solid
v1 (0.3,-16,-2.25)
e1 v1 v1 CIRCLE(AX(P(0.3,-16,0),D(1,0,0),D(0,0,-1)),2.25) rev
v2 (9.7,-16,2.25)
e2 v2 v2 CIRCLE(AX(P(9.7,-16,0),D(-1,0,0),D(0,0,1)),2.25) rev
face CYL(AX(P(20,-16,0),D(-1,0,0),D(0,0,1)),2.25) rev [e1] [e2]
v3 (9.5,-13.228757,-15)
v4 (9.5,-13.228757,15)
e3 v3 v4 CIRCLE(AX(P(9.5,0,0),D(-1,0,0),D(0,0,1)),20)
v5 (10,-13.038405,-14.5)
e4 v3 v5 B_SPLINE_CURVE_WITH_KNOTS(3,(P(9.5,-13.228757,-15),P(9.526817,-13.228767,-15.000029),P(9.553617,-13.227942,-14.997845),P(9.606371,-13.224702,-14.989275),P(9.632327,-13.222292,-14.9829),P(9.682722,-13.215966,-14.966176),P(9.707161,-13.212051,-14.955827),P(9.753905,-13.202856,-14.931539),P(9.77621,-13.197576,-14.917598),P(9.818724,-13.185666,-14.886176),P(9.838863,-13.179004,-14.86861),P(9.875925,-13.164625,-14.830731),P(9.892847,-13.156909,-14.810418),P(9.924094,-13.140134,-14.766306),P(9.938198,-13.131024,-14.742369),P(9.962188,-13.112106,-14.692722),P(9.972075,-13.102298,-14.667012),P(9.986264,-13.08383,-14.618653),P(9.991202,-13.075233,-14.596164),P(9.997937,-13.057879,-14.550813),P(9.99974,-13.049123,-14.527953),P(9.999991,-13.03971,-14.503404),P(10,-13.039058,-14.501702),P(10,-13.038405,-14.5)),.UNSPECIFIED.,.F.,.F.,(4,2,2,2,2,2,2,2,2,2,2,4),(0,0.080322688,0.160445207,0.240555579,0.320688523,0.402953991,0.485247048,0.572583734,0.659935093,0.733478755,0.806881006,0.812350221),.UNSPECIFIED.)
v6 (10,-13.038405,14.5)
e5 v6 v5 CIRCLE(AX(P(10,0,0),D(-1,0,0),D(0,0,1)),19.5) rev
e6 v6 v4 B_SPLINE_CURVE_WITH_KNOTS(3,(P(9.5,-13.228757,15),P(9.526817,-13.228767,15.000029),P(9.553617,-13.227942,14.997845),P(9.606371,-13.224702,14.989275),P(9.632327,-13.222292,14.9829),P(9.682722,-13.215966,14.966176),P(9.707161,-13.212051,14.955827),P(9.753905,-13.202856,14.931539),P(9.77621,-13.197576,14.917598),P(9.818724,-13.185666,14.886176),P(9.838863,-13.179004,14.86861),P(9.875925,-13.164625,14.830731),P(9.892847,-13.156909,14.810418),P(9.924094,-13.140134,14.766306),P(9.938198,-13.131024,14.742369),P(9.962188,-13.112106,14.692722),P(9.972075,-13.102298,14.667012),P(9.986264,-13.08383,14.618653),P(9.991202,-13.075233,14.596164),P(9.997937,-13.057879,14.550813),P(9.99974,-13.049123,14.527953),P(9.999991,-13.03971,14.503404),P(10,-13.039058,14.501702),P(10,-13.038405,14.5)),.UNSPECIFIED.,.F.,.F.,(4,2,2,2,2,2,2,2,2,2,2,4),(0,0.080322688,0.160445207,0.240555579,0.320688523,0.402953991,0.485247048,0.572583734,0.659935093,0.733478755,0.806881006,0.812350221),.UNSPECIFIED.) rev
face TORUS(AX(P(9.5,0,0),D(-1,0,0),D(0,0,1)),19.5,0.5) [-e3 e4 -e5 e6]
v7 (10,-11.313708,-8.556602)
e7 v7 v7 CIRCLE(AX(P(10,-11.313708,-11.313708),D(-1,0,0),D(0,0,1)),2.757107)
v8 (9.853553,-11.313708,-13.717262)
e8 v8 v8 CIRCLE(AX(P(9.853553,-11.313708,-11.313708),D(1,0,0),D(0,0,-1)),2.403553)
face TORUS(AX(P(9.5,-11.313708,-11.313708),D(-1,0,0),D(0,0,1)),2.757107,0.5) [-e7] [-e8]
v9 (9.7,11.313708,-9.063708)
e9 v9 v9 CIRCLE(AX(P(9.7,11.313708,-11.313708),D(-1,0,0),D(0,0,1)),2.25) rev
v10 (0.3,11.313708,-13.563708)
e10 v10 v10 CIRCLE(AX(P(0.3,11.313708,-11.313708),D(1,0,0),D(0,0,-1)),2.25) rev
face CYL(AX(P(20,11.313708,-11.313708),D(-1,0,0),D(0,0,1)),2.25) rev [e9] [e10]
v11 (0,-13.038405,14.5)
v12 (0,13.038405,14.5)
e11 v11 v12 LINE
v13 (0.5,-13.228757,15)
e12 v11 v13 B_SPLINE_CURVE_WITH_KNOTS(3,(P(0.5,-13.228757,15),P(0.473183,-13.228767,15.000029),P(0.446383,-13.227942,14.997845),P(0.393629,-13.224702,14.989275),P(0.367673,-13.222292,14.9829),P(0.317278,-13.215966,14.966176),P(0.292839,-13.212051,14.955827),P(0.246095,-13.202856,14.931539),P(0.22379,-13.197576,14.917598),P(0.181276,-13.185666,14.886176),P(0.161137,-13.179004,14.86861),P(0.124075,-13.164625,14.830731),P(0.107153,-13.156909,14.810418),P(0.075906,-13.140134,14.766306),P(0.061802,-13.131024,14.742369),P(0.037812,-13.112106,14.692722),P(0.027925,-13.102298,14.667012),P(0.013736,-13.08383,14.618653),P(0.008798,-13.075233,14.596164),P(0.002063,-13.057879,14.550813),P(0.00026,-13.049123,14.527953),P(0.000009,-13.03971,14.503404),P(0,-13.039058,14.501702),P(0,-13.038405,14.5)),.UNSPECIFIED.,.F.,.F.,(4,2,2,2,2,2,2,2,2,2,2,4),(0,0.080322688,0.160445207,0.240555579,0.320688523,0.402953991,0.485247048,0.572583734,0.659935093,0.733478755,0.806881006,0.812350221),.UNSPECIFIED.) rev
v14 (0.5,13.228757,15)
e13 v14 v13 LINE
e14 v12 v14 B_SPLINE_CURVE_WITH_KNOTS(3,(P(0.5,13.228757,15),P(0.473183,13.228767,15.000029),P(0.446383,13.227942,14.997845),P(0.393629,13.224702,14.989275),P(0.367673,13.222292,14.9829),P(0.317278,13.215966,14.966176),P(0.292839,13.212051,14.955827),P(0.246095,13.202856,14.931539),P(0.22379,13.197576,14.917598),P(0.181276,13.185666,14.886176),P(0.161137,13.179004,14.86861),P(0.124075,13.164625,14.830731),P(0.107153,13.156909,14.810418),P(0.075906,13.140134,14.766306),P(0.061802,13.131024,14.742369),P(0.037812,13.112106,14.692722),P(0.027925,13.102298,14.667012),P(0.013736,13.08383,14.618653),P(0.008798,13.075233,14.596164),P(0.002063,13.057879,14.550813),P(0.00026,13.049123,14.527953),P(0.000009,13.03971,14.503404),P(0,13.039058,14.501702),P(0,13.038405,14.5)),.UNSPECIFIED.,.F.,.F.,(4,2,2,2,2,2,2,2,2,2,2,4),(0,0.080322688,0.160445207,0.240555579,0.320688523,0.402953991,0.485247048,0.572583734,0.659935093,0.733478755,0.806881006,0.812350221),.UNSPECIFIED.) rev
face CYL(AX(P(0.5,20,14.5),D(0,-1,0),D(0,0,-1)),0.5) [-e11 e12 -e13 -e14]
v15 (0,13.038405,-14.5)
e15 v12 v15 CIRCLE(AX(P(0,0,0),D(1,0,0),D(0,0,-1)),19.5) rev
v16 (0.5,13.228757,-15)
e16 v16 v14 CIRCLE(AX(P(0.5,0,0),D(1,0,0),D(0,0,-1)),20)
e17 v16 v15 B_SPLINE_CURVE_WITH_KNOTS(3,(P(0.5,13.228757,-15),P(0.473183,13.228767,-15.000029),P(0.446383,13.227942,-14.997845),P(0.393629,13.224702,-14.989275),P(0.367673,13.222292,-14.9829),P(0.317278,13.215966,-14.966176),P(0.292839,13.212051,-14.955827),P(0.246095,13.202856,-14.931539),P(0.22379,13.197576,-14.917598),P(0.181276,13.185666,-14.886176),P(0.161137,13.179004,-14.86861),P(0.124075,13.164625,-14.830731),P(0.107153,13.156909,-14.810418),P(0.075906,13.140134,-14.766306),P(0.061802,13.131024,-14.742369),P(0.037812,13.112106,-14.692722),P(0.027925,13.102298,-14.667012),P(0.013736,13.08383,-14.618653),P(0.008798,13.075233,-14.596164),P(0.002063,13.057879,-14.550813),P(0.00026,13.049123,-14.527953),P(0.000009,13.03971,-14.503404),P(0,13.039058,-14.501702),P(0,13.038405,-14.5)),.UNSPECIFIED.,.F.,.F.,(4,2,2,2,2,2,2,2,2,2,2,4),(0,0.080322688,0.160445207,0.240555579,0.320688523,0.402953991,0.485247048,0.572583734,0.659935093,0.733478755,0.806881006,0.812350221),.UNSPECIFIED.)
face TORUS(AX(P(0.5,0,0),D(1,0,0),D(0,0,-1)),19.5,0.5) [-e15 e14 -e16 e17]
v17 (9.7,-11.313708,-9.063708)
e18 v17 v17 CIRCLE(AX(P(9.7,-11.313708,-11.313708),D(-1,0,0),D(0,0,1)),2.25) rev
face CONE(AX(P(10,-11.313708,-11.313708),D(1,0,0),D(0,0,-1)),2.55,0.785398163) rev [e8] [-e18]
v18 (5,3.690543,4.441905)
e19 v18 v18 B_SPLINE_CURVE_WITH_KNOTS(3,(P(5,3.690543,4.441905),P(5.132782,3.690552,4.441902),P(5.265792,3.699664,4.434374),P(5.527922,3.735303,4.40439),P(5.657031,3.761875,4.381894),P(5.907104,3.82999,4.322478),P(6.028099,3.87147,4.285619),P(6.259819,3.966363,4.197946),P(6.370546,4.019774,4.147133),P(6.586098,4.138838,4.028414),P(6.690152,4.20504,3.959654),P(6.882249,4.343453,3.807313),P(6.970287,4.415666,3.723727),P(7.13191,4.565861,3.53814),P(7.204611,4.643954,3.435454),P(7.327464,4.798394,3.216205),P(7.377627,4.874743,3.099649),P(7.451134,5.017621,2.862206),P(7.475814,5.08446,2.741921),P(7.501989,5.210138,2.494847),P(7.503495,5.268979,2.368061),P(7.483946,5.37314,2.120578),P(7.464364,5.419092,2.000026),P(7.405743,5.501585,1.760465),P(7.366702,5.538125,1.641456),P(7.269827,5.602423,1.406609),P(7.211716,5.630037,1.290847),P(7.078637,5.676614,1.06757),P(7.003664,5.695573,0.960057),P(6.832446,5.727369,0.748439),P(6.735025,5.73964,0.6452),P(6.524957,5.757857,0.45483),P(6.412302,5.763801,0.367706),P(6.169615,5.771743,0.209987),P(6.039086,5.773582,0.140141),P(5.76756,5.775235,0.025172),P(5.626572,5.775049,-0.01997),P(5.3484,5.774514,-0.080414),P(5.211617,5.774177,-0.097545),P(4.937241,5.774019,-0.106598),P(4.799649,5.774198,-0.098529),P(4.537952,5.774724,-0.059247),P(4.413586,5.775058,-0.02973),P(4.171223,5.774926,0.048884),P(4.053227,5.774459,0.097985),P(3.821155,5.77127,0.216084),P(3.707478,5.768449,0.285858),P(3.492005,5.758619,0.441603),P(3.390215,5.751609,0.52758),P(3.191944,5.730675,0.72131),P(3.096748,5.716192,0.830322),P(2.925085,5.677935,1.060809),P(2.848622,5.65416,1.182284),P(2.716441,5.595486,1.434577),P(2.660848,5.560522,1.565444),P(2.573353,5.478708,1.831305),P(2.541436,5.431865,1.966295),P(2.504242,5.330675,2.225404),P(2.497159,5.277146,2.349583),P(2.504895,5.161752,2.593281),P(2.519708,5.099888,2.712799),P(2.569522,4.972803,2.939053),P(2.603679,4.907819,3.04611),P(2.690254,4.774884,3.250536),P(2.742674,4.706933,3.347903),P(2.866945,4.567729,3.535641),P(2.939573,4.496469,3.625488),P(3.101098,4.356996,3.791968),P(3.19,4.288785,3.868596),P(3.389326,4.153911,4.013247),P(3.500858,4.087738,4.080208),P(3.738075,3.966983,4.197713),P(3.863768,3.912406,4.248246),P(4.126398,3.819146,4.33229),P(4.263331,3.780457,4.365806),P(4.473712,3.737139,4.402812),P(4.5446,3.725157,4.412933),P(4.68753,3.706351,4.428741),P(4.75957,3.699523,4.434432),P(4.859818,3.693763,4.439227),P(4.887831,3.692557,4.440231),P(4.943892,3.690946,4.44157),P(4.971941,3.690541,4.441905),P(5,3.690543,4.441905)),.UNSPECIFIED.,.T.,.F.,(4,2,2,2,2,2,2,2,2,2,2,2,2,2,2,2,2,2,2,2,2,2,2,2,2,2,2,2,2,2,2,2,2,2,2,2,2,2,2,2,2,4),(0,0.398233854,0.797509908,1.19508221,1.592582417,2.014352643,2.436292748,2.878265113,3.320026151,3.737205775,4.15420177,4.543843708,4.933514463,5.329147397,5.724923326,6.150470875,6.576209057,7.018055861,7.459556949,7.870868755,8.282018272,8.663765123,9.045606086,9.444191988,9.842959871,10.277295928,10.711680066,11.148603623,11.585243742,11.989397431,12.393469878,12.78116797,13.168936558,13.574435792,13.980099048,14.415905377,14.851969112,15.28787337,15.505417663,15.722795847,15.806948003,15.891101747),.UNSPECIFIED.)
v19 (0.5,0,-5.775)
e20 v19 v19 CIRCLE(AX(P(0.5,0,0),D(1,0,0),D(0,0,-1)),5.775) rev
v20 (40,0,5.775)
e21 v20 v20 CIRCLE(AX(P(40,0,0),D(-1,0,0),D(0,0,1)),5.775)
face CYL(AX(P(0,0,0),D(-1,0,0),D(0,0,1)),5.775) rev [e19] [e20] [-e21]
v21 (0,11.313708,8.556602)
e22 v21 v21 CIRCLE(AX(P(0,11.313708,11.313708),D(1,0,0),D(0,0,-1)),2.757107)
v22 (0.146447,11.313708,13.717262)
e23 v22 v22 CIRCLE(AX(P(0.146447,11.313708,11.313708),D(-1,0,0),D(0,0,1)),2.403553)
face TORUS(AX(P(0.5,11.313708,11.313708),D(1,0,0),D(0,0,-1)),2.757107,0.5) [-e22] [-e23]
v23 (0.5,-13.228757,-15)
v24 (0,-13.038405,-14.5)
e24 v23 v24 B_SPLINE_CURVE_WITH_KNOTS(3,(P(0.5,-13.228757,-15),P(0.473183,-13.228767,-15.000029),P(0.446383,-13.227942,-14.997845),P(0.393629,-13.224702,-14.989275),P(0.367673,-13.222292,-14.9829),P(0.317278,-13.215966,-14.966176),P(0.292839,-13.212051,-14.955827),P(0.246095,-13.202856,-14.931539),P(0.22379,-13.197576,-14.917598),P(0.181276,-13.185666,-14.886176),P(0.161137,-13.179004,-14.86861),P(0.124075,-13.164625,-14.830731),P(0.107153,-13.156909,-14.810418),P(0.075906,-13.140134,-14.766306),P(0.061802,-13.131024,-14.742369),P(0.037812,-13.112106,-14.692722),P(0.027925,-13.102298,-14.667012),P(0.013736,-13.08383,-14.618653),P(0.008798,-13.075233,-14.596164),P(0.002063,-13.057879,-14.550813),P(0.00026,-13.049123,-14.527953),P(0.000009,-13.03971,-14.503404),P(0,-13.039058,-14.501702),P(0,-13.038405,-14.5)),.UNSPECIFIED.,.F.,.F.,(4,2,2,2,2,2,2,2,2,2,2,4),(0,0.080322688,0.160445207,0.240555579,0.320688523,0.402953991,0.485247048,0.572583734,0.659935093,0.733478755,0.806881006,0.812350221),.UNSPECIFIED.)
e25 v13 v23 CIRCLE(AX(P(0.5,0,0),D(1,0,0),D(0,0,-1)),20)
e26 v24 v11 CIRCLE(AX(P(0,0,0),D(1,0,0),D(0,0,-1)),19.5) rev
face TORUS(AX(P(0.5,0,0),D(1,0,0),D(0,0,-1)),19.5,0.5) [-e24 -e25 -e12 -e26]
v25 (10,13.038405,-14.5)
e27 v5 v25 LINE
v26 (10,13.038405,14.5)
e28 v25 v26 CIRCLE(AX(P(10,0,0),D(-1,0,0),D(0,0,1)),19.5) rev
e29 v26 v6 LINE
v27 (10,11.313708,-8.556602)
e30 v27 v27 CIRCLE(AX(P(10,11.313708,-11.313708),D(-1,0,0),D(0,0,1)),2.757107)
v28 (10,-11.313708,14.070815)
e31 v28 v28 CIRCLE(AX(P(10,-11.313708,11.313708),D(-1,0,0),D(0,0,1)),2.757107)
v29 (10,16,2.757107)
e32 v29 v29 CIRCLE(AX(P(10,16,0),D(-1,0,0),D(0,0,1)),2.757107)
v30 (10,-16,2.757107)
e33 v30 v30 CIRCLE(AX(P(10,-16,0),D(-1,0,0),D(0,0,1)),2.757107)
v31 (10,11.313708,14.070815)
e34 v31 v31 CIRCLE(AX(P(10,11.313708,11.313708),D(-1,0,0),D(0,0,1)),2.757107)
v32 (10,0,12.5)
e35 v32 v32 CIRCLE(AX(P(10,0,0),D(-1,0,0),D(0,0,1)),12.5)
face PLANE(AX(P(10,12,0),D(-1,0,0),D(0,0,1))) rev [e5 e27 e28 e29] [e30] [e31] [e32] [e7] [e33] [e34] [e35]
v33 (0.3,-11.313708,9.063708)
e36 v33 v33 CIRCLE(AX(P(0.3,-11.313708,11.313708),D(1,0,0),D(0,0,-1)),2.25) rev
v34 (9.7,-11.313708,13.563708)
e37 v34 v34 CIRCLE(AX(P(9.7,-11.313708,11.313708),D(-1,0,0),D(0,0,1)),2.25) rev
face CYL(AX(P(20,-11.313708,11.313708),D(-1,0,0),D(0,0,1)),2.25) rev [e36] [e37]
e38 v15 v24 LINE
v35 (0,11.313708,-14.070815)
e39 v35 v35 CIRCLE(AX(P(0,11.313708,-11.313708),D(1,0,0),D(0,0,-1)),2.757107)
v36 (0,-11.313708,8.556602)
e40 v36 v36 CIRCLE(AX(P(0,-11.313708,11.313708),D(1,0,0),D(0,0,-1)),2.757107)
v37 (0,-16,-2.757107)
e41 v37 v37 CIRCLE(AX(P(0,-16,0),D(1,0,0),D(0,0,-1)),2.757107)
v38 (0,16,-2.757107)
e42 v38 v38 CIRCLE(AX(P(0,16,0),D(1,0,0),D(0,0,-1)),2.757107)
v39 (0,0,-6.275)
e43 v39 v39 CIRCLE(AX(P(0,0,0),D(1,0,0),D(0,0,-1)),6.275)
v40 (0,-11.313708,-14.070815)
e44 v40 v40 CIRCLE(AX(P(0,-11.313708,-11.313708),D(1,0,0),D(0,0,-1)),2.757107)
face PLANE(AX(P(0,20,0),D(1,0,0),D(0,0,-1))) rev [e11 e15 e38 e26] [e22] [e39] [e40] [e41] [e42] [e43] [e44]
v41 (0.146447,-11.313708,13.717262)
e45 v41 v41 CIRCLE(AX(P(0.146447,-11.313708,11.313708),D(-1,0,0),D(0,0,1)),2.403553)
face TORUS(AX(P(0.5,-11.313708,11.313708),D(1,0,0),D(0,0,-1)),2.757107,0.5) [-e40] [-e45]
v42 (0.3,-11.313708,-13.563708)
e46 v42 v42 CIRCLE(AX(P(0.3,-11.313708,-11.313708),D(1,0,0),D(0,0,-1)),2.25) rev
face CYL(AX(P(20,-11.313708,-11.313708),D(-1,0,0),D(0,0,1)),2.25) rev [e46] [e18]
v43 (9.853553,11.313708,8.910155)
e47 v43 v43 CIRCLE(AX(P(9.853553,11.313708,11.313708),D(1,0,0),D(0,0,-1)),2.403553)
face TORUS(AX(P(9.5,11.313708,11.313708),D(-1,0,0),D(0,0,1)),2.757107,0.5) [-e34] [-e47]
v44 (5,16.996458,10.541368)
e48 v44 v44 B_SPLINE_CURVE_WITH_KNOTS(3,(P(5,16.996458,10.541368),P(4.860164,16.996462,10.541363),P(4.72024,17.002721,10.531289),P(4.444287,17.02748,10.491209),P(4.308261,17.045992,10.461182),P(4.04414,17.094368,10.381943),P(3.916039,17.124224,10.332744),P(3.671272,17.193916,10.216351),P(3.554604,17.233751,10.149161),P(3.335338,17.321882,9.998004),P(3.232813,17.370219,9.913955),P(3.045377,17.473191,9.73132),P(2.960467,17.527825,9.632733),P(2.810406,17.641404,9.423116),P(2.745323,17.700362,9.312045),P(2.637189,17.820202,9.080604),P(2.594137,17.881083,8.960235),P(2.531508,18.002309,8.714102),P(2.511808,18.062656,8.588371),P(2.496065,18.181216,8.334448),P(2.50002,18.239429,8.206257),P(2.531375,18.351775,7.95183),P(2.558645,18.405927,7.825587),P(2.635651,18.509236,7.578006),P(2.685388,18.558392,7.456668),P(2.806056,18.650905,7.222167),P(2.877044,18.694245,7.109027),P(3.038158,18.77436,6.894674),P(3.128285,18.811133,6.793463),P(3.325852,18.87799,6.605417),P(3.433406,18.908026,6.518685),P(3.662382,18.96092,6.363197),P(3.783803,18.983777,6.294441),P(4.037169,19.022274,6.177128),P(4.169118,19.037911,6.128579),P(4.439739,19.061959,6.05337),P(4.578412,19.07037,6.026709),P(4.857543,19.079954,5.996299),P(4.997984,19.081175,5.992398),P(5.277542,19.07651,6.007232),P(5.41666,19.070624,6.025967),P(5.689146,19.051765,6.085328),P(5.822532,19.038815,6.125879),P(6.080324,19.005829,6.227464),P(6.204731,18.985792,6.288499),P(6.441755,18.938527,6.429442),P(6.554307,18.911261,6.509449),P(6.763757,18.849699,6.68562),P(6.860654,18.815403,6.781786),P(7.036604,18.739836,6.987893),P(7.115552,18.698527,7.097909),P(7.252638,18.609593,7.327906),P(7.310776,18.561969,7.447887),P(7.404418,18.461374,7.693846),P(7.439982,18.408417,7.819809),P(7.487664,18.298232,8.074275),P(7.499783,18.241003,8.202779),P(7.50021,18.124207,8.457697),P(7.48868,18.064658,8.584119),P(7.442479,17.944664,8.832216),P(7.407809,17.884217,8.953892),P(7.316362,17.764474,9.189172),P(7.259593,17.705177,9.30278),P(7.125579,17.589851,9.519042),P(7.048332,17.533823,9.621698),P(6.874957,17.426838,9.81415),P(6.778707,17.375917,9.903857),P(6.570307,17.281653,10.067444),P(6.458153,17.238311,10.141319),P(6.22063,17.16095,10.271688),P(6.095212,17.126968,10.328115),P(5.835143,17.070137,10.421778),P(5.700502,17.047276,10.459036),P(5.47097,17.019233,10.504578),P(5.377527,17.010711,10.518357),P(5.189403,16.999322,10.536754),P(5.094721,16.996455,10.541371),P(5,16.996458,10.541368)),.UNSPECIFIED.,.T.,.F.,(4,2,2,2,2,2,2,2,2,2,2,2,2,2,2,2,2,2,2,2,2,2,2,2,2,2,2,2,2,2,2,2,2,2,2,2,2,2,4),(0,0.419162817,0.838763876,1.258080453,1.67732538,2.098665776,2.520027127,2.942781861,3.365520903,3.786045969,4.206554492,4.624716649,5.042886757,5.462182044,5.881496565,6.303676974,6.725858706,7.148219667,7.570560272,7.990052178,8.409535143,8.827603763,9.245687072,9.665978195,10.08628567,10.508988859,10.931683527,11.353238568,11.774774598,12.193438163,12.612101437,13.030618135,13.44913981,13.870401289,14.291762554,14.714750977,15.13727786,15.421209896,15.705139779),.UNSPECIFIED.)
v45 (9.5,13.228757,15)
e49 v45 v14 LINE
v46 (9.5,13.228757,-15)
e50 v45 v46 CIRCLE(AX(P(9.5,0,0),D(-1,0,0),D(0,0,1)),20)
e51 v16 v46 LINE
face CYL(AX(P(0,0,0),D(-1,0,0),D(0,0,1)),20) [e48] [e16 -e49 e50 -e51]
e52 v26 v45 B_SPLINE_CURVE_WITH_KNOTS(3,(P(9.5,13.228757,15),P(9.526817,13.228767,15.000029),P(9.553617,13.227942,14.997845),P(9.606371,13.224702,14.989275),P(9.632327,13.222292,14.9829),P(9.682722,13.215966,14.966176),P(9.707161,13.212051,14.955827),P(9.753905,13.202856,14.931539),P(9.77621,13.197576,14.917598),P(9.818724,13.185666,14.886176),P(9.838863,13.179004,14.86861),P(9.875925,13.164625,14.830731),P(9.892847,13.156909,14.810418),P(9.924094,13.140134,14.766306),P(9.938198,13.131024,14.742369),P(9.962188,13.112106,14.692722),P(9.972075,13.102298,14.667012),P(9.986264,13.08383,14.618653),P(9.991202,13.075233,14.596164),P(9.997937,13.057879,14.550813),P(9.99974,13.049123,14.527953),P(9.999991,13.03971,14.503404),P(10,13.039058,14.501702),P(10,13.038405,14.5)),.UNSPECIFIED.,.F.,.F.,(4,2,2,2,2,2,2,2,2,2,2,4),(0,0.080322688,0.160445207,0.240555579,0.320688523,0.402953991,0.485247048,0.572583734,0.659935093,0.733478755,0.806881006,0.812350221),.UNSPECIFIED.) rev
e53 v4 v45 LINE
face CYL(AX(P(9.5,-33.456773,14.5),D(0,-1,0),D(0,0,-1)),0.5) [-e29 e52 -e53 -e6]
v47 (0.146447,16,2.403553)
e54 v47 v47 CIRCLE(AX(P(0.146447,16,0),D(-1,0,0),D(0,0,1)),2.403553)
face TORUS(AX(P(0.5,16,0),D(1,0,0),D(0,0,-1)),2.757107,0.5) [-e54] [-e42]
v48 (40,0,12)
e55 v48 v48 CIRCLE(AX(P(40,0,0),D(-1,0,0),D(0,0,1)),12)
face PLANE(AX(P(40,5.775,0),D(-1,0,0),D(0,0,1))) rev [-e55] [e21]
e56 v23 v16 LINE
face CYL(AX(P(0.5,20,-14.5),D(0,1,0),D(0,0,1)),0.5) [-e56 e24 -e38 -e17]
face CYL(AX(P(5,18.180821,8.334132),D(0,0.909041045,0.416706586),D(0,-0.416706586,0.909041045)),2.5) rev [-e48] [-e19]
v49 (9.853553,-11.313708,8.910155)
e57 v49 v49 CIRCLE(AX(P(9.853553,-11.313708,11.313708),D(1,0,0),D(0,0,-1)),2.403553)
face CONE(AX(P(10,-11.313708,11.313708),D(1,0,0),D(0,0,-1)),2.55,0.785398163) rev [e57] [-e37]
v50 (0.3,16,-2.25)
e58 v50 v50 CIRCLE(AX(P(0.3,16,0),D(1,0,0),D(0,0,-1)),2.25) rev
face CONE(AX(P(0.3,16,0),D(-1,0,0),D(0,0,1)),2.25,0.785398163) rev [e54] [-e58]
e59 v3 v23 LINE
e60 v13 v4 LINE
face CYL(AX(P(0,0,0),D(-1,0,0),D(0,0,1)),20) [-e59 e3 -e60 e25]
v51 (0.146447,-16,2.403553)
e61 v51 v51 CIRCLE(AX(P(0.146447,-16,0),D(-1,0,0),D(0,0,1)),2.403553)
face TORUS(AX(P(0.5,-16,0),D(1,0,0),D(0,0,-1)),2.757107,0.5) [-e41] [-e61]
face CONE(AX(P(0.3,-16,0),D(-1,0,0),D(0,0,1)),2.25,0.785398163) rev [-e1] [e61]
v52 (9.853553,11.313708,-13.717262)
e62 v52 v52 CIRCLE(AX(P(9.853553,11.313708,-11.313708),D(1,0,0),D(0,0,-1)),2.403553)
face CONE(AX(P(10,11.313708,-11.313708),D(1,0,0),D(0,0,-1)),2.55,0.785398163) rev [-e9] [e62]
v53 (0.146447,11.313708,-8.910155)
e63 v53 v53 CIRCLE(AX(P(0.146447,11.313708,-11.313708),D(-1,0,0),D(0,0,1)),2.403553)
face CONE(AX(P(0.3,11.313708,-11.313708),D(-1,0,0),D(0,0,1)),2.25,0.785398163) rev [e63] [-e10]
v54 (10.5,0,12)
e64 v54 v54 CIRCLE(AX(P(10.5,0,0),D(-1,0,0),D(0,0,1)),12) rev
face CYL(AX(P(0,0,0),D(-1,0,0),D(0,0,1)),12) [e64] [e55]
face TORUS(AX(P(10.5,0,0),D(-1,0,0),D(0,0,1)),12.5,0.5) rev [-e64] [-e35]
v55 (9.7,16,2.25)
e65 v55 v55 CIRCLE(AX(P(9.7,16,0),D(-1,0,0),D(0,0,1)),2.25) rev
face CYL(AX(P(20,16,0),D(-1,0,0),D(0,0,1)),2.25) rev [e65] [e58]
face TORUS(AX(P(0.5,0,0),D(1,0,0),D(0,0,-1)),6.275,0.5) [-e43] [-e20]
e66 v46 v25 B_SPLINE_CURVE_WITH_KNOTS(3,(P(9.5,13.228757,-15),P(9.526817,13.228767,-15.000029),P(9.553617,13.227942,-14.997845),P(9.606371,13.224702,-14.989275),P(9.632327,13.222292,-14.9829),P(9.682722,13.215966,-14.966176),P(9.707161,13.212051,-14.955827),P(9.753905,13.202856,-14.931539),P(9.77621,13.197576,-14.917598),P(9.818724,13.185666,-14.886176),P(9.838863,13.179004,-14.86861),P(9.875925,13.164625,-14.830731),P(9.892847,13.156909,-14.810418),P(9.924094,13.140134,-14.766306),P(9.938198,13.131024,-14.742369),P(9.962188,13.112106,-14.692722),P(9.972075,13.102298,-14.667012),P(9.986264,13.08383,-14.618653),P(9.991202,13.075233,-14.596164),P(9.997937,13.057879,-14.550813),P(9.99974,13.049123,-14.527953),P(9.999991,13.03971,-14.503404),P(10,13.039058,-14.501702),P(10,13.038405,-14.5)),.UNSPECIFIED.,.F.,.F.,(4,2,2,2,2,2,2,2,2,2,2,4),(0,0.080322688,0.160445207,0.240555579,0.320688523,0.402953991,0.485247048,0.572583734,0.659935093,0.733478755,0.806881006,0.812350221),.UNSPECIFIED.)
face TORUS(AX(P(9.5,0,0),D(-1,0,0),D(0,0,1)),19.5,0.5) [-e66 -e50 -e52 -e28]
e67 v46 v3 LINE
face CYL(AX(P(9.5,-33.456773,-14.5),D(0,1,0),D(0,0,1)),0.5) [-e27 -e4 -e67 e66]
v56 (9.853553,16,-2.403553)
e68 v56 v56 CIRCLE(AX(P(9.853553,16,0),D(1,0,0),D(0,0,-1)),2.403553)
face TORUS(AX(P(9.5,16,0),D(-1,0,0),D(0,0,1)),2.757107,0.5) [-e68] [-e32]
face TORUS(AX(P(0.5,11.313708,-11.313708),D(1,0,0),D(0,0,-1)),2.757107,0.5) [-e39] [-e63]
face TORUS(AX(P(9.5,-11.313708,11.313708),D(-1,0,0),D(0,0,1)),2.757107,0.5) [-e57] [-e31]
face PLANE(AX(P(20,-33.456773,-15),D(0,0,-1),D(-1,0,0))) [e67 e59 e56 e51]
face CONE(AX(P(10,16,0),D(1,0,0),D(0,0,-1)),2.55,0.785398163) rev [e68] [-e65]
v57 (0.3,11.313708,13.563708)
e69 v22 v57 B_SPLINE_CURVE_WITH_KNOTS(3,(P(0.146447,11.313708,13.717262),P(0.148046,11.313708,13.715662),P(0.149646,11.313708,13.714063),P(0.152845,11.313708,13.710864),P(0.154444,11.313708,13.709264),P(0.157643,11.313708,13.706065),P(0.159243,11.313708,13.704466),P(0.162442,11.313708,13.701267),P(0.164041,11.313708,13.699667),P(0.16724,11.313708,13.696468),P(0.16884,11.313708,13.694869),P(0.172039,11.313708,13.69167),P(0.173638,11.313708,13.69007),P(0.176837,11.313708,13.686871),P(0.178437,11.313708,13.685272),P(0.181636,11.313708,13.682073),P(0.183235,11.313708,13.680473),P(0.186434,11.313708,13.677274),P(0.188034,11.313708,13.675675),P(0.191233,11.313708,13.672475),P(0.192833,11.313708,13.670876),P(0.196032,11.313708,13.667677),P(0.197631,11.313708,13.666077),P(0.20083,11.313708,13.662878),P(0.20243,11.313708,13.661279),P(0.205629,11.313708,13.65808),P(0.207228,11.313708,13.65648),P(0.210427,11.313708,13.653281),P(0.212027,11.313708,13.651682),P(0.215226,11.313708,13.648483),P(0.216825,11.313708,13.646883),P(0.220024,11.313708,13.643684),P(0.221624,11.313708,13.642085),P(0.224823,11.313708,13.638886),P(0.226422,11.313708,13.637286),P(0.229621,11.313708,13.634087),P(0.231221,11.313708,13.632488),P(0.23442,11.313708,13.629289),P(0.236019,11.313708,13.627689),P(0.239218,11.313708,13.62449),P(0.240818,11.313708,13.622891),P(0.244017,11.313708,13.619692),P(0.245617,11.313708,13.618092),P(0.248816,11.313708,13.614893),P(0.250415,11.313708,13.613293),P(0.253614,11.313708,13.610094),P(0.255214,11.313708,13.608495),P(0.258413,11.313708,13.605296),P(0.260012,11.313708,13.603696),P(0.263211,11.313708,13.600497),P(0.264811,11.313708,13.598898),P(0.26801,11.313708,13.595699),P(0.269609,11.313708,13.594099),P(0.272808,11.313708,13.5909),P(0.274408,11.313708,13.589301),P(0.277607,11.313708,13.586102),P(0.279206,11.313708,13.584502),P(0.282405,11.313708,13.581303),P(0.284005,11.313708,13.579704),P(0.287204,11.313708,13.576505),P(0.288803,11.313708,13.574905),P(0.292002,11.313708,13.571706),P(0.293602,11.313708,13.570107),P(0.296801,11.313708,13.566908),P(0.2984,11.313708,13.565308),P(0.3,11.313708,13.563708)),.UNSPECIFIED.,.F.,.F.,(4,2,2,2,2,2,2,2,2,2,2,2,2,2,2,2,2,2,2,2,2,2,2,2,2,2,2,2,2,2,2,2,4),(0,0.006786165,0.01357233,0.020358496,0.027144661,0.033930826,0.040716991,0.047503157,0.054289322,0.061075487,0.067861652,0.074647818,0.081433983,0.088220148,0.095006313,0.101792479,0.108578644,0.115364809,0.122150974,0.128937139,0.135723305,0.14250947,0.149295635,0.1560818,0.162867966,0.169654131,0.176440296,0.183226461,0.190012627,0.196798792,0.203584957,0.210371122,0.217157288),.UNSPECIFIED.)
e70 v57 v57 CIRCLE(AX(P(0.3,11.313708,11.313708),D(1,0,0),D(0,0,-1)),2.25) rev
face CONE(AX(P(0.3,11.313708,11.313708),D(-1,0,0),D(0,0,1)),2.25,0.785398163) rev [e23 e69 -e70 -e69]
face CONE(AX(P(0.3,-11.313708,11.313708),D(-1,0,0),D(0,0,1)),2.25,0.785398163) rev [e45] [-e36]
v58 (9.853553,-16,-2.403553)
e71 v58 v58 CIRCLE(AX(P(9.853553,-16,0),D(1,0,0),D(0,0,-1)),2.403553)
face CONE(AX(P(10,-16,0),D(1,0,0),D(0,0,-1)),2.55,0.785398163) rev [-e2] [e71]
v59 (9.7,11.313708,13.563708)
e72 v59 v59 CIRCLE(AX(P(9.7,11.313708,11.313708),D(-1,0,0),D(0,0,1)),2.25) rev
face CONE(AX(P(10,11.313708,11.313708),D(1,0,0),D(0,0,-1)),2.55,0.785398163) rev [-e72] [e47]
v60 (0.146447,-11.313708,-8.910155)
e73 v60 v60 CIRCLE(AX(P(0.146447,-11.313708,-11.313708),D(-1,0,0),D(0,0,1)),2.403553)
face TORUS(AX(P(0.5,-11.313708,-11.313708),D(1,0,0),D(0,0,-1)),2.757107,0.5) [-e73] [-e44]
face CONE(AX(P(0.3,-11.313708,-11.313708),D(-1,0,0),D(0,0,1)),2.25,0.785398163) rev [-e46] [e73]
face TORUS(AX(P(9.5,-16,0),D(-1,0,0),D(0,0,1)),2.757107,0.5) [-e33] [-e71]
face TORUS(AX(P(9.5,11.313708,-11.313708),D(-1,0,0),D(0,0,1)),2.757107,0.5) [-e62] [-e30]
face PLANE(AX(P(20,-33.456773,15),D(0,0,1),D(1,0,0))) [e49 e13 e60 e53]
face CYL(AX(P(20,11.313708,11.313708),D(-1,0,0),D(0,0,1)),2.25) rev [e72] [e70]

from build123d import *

# Parameters (mm, degrees)
CUT_EXTRUDE1_START = -10
CUT_EXTRUDE1_DEPTH = 10
SKETCH3_R          = 2.25
CUT_EXTRUDE2_DEPTH = 20
M6X1_01_REACH      = 58.809
M6X1_01_BORE_R     = 2.5
CHAMFER1_SIZE      = 0.3
FILLET1_R          = 0.5
FILLET2_R          = 0.5
FILLET3_R          = 0.5


# Read off the part's stored shape, not the designer's step: Cut-Extrude1
with BuildPart() as part:
    # Sketch1 → Revolve1 (revolve)
    with BuildSketch(Plane.XY, mode=Mode.PRIVATE) as revolve1_sk:
        Polygon((0, 5.775), (40, 5.775), (40, 12), (10, 12), (10, 20), (0, 20), align=None)
    revolve(revolve1_sk.sketch.rotate(Axis((0, 0, 0), (1, 0, 0)), 90), axis=Axis((0, 0, 0), (1, 0, 0)))

    # Cut-Extrude1 outline → Cut-Extrude1 (cut)
    with BuildSketch(Plane.ZY.offset(CUT_EXTRUDE1_START)):
        with BuildLine():
            Line((15, 13.228756555), (15, -13.228756555))
            ThreePointArc((15, -13.228756555), (20, 0), (15, 13.228756555))
        make_face()
        with BuildLine():
            ThreePointArc((-15, 13.228756555), (-20, 0), (-15, -13.228756555))
            Line((-15, -13.228756555), (-15, 13.228756555))
        make_face()
    extrude(amount=CUT_EXTRUDE1_DEPTH, mode=Mode.SUBTRACT)

    # Sketch3 → Cut-Extrude2 (cut)
    with BuildSketch(Plane.ZY):
        with Locations((0, 16)):
            Circle(SKETCH3_R)
        with Locations((11.313708499, 11.313708499)):
            Circle(SKETCH3_R)
        with Locations((11.313708499, -11.313708499)):
            Circle(SKETCH3_R)
        with Locations((0, -16)):
            Circle(SKETCH3_R)
        with Locations((-11.313708499, -11.313708499)):
            Circle(SKETCH3_R)
        with Locations((-11.313708499, 11.313708499)):
            Circle(SKETCH3_R)
    extrude(amount=-CUT_EXTRUDE2_DEPTH, mode=Mode.SUBTRACT)

    # Отверстие обработанное метчиком M6x1.01 bore (on position points) → Отверстие обработанное метчиком M6x1.01 (cut, up to next)
    with BuildSketch(Plane(origin=(5, 18.180820892, 8.334131729), x_dir=(0, -0.416706586463, 0.909041044617), z_dir=(0, 0.909041044617, 0.416706586463)), mode=Mode.PRIVATE) as m6x1_01_sk1:
        Circle(M6X1_01_BORE_R)
    m6x1_01_tool1 = extrude(m6x1_01_sk1.sketch, amount=-M6X1_01_REACH, mode=Mode.PRIVATE) & part.part
    add(m6x1_01_tool1.solids().sort_by_distance((5, 18.180821, 8.334132))[0], mode=Mode.SUBTRACT)

    # Chamfer1
    chamfer1_edges = [part.edges().sort_by_distance(p)[0] for p in [
        (10, 16, -2.25),
        (0, 16, -2.25),
        (10, 11.313708499, 9.063708499),
        (0, 11.313708499, 9.063708499),
        (10, -11.313708499, 9.063708499),
        (0, -11.313708499, 9.063708499),
        (10, -16, -2.25),
        (0, -16, -2.25),
        (10, -11.313708499, -13.563708499),
        (0, -11.313708499, -13.563708499),
        (10, 11.313708499, -13.563708499),
        (0, 11.313708499, -13.563708499),
    ]]
    chamfer(chamfer1_edges, length=CHAMFER1_SIZE)

    # Fillet1
    fillet1_edges = [part.edges().sort_by_distance(p)[0] for p in [
        (0, 0, -5.775),
    ]]
    fillet(fillet1_edges, radius=FILLET1_R)

    # Fillet2
    fillet2_edges = [part.edges().sort_by_distance(p)[0] for p in [
        (0, -20, 0),
        (0, 0, -15),
        (0, 0, 15),
        (0, 20, 0),
        (0, -11.313708499, -13.863708499),
        (0, 11.313708499, -13.863708499),
        (0, 16, -2.55),
        (0, 11.313708499, 8.763708499),
        (0, -16, -2.55),
        (0, -11.313708499, 8.763708499),
    ]]
    fillet(fillet2_edges, radius=FILLET2_R)

    # Fillet3
    fillet3_edges = [part.edges().sort_by_distance(p)[0] for p in [
        (10, -20, 0),
        (10, 0, -15),
        (10, 0, 15),
        (10, 20, 0),
        (10, 0, -12),
        (10, 11.313708499, 8.763708499),
        (10, 16, -2.55),
        (10, 11.313708499, -13.863708499),
        (10, -11.313708499, -13.863708499),
        (10, -16, -2.55),
        (10, -11.313708499, 8.763708499),
    ]]
    fillet(fillet3_edges, radius=FILLET3_R)


solid = part.part
